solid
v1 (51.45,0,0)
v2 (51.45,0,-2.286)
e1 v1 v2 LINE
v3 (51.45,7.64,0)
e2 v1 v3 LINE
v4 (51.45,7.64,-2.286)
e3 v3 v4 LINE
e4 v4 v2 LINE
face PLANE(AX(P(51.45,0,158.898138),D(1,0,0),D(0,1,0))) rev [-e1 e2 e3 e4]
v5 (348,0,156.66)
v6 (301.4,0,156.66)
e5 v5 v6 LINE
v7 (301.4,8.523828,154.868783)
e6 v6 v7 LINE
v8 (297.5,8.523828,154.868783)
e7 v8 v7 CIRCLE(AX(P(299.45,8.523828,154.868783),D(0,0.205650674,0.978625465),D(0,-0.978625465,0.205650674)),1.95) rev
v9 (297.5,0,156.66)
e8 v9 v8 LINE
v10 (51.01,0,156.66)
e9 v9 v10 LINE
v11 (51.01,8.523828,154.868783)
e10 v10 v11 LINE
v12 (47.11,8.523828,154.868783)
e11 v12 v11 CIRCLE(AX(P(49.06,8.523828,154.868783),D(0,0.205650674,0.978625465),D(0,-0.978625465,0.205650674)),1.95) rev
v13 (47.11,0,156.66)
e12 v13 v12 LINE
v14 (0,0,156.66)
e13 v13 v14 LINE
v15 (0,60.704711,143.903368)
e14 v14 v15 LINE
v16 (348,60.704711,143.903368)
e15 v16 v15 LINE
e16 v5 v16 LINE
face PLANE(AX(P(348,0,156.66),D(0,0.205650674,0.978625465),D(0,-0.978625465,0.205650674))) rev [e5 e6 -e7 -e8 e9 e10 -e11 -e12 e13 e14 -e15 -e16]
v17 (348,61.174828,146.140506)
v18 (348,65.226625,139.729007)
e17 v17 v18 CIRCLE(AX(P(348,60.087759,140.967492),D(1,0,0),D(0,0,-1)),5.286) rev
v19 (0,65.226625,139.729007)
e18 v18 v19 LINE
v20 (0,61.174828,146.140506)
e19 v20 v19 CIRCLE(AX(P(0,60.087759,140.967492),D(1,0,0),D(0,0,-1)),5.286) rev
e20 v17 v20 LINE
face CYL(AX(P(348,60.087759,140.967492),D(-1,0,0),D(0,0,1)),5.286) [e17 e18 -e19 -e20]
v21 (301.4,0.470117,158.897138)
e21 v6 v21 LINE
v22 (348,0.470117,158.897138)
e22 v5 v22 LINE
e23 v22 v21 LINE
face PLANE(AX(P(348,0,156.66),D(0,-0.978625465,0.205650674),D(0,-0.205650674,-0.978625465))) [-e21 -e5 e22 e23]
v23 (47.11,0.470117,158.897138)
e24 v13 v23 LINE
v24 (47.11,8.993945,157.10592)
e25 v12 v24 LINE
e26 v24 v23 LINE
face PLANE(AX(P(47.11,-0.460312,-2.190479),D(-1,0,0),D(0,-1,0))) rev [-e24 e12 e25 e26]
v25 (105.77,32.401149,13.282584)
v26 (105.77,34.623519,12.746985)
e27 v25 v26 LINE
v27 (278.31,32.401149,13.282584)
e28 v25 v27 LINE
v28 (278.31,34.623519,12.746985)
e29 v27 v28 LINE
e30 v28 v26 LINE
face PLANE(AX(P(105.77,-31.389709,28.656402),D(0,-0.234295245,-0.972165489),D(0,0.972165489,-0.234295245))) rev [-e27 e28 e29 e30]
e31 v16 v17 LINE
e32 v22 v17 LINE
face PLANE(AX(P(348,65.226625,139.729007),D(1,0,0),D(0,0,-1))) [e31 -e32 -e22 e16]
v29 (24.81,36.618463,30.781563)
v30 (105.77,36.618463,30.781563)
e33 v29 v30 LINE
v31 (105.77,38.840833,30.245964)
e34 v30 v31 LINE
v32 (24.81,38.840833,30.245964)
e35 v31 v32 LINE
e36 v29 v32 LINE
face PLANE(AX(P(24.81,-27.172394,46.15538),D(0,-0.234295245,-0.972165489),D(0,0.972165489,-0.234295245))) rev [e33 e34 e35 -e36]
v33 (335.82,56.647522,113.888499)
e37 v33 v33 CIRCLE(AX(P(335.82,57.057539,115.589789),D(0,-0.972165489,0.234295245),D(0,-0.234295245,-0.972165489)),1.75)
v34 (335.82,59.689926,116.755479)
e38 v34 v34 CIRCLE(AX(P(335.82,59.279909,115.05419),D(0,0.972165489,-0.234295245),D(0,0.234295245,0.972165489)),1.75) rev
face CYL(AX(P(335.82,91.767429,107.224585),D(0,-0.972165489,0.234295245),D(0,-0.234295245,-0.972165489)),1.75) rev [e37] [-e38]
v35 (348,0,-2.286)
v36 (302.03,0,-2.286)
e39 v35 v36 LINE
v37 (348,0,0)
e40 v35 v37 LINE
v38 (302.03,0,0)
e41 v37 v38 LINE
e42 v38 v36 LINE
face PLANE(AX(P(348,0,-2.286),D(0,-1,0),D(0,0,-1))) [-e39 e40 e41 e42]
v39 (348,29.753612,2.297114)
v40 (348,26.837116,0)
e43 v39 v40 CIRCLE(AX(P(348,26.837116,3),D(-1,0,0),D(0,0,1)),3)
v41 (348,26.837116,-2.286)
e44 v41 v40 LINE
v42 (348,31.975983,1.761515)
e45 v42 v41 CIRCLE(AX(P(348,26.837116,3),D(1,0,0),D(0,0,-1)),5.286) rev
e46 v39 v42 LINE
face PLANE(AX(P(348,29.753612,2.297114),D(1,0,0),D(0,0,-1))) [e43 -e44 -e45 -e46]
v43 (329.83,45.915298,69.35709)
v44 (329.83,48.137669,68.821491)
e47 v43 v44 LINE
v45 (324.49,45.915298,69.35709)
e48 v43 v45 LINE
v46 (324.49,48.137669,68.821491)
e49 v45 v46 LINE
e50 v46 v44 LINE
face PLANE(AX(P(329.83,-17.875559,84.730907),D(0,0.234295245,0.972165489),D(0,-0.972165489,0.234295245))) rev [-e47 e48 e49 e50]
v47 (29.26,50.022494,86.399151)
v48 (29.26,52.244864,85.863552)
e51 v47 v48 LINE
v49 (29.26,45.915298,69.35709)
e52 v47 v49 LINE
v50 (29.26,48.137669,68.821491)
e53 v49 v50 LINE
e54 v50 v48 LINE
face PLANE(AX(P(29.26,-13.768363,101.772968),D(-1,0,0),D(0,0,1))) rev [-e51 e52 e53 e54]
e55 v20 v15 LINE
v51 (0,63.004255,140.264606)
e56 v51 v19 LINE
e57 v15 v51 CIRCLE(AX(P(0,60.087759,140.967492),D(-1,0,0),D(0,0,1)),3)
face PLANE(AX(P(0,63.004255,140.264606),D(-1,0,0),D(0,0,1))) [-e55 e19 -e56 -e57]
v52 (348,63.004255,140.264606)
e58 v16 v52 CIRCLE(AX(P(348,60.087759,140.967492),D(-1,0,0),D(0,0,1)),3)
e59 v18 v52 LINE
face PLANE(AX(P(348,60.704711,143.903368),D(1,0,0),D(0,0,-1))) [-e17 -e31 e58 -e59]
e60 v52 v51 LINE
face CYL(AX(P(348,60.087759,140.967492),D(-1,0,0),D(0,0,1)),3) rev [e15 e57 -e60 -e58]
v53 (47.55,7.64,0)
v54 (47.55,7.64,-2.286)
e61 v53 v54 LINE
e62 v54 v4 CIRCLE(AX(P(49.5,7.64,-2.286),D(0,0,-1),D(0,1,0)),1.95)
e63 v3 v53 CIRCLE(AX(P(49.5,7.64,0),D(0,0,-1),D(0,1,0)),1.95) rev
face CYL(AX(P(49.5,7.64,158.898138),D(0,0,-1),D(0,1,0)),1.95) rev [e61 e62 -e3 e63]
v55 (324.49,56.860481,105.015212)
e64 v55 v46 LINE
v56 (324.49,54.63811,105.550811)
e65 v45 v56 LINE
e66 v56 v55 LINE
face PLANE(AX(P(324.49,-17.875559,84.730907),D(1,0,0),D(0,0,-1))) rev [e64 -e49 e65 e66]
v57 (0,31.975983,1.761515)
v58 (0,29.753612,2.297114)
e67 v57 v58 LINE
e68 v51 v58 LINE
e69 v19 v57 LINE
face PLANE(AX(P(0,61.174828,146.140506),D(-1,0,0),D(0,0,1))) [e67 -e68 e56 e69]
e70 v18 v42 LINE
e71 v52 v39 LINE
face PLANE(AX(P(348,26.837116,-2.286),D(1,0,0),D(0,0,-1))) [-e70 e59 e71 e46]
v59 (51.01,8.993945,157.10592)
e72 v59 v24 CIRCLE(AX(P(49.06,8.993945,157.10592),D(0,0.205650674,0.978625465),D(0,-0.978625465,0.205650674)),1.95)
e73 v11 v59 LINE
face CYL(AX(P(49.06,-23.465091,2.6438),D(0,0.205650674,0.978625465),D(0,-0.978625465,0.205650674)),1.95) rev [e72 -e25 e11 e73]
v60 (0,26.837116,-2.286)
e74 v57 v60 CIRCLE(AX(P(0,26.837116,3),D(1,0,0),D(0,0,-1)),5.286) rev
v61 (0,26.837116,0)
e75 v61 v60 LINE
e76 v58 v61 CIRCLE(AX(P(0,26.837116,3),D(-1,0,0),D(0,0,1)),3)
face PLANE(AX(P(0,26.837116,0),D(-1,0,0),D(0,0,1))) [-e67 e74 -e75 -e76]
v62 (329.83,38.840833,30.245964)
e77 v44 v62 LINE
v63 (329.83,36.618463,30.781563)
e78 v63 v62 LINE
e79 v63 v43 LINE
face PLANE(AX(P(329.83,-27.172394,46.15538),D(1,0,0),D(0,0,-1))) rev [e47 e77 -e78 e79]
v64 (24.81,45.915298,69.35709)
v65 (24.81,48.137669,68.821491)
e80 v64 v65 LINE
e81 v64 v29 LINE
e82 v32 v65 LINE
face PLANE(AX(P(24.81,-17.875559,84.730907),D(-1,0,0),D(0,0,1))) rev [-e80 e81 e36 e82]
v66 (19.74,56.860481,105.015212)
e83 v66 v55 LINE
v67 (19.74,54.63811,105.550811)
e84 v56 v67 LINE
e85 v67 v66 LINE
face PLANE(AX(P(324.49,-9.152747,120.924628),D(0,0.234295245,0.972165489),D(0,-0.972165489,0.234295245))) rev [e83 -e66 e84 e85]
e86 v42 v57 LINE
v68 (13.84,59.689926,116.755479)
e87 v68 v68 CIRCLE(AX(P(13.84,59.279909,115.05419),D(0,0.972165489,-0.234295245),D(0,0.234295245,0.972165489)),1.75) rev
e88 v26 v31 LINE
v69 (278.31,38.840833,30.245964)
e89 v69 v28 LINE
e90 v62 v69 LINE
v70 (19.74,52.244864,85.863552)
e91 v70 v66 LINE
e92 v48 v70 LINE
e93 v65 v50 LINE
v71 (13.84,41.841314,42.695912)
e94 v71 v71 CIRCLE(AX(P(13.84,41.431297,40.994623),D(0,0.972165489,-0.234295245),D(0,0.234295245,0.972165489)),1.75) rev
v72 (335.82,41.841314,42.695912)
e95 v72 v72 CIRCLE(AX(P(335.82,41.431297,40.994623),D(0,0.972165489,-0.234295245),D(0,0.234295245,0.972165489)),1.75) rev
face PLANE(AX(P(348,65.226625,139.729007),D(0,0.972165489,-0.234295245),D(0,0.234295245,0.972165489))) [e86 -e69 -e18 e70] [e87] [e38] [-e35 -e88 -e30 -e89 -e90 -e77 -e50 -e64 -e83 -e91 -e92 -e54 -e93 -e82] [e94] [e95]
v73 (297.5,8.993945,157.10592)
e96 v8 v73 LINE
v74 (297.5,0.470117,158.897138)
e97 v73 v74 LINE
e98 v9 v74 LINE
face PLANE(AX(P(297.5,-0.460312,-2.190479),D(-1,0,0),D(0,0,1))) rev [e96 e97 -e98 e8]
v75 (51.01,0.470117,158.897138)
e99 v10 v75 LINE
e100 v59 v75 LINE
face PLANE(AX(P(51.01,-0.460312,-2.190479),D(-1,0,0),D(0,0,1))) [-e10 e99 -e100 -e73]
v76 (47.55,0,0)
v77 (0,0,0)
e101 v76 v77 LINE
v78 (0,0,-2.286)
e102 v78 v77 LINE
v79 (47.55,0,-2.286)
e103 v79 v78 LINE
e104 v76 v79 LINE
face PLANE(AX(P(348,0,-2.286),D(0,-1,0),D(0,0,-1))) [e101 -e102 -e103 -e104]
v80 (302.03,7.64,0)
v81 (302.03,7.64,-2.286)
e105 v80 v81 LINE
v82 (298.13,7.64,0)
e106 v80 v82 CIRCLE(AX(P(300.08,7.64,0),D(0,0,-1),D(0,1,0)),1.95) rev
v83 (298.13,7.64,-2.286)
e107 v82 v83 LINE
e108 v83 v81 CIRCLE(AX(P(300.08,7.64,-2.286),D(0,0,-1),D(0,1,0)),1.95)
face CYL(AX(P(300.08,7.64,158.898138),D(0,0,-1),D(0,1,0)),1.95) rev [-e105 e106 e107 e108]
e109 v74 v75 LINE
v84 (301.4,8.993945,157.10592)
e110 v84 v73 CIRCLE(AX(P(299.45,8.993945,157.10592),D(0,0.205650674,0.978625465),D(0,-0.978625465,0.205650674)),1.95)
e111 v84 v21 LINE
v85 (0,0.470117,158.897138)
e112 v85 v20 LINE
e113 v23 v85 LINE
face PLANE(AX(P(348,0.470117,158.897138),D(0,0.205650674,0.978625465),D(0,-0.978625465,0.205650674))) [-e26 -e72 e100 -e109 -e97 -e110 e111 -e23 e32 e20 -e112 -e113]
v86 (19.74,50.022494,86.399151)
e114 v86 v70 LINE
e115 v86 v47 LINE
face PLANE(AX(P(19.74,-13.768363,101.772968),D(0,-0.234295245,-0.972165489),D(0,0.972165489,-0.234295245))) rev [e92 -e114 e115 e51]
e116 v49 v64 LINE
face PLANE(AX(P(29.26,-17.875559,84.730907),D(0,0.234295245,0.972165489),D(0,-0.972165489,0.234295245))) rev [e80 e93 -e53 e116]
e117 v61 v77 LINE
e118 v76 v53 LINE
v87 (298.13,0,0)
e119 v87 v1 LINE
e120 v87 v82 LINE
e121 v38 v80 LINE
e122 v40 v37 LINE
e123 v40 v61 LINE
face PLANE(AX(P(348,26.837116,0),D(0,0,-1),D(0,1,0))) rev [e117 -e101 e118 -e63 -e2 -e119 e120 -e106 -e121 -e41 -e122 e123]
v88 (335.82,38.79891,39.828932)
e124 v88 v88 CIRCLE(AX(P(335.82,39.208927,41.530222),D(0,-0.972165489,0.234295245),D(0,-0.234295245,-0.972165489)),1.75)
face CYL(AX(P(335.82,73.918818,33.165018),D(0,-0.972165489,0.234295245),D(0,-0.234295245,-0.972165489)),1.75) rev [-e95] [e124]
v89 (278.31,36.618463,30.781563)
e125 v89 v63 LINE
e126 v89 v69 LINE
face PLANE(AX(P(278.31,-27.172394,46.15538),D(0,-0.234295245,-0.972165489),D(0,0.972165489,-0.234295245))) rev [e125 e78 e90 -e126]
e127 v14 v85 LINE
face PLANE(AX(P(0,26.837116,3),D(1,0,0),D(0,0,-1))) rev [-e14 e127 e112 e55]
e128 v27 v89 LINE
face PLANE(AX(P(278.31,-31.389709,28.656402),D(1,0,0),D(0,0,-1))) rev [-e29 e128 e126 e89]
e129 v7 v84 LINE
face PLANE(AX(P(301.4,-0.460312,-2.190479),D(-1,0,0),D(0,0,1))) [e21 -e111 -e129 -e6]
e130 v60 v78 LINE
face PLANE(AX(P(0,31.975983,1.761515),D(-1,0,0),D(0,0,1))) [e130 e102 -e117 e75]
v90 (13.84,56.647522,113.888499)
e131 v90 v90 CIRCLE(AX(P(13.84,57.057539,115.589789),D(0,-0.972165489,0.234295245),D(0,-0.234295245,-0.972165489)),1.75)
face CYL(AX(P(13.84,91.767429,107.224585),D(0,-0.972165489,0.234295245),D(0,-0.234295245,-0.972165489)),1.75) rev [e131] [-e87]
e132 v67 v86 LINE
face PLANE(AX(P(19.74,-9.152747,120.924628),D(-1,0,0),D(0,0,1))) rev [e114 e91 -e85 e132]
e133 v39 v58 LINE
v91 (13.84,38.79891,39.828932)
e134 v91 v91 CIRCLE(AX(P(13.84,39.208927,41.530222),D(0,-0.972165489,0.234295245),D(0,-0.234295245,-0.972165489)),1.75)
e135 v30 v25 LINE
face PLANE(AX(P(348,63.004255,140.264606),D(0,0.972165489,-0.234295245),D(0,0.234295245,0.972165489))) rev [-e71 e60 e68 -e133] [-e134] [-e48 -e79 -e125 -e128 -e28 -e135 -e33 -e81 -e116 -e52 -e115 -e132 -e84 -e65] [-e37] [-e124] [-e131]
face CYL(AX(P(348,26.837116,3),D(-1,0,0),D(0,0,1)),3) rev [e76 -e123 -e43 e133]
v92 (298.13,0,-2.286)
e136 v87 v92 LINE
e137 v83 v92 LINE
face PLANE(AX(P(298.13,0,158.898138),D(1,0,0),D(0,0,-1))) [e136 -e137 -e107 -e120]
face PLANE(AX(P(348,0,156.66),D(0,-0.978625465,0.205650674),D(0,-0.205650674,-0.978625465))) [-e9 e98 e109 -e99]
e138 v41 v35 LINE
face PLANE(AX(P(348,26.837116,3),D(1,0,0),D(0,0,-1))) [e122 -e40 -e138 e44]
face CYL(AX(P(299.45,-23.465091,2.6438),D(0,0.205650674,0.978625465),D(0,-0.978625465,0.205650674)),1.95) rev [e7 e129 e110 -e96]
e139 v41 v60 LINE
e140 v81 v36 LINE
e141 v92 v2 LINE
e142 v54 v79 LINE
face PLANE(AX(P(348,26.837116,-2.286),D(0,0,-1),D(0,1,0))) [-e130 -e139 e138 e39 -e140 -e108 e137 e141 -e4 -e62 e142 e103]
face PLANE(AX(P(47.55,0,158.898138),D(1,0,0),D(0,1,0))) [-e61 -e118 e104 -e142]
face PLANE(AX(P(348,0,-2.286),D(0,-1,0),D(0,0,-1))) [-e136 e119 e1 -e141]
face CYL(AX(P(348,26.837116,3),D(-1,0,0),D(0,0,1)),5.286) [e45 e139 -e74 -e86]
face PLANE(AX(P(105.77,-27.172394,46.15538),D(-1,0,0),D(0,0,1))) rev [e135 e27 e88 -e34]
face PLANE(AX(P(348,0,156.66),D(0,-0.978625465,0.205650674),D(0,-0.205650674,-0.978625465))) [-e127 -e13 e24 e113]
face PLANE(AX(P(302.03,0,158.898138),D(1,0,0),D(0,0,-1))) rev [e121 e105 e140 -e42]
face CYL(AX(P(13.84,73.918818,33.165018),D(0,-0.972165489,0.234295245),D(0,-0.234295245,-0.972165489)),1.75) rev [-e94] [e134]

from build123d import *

# Parameters (mm, degrees)
BASE_FLANGE1_DEPTH = 348
CUT_EXTRUDE1_REACH = 391.047
SKETCH6_R          = 1.95
CUT_EXTRUDE2_REACH = 384.238
SKETCH7_R          = 1.95
CUT_EXTRUDE3_REACH = 389.236
CUT_EXTRUDE4_REACH = 389.217
SKETCH9_R          = 1.75


# Sheet-metal steps are written as plain solids
with BuildPart() as part:
    # Sketch1 → Base-Flange1 (new body)
    with BuildSketch(Plane(origin=(0, 0, 0), x_dir=(0, 0, -1), z_dir=(1, 0, 0))):
        with BuildLine():
            Line((-156.66, 0), (-143.903368262, 60.704710735))
            ThreePointArc((-143.903368262, 60.704710735), (-142.570157767, 62.623791445), (-140.264606132, 63.004255181))
            Line((-140.264606132, 63.004255181), (-2.297114265, 29.753612482))
            ThreePointArc((-2.297114265, 29.753612482), (-0.643237686, 28.693367991), (0, 26.837116015))
            Line((0, 26.837116015), (0, 0))
            Line((0, 0), (2.286, 0))
            Line((2.286, 0), (2.286, 26.837116015))
            ThreePointArc((2.286, 26.837116015), (1.152615197, 30.107831996), (-1.761515334, 31.97598279))
            Line((-1.761515334, 31.97598279), (-139.729007202, 65.226625489))
            ThreePointArc((-139.729007202, 65.226625489), (-143.791389182, 64.556248387), (-146.140506074, 61.174828176))
            Line((-146.140506074, 61.174828176), (-158.897137813, 0.47011744))
            Line((-158.897137813, 0.47011744), (-156.66, 0))
        make_face()
    extrude(amount=BASE_FLANGE1_DEPTH)

    # Sketch6 → Cut-Extrude1 (cut, up to next)
    with BuildSketch(Plane(origin=(0, 0, -2.286), x_dir=(-1, 0, 0), z_dir=(0, 0, -1)), mode=Mode.PRIVATE) as cut_extrude1_sk1:
        with BuildLine():
            Line((-51.45, 7.64), (-51.45, 0))
            Line((-51.45, 0), (-47.55, 0))
            Line((-47.55, 0), (-47.55, 7.64))
            ThreePointArc((-47.55, 7.64), (-49.5, 5.69), (-51.45, 7.64))
        make_face()
    cut_extrude1_tool1 = extrude(cut_extrude1_sk1.sketch, amount=-CUT_EXTRUDE1_REACH, mode=Mode.PRIVATE) & part.part
    # Sketch6 → Cut-Extrude1 (cut, up to next)
    with BuildSketch(Plane(origin=(0, 0, -2.286), x_dir=(-1, 0, 0), z_dir=(0, 0, -1)), mode=Mode.PRIVATE) as cut_extrude1_sk2:
        with Locations((-49.5, 7.64)):
            Circle(SKETCH6_R)
    cut_extrude1_tool2 = extrude(cut_extrude1_sk2.sketch, amount=-CUT_EXTRUDE1_REACH, mode=Mode.PRIVATE) & part.part
    # Sketch6 → Cut-Extrude1 (cut, up to next)
    with BuildSketch(Plane(origin=(0, 0, -2.286), x_dir=(-1, 0, 0), z_dir=(0, 0, -1)), mode=Mode.PRIVATE) as cut_extrude1_sk3:
        with BuildLine():
            ThreePointArc((-298.13, 7.64), (-300.08, 5.69), (-302.03, 7.64))
            Line((-302.03, 7.64), (-302.03, 0))
            Line((-302.03, 0), (-298.13, 0))
            Line((-298.13, 0), (-298.13, 7.64))
        make_face()
    cut_extrude1_tool3 = extrude(cut_extrude1_sk3.sketch, amount=-CUT_EXTRUDE1_REACH, mode=Mode.PRIVATE) & part.part
    # Sketch6 → Cut-Extrude1 (cut, up to next)
    with BuildSketch(Plane(origin=(0, 0, -2.286), x_dir=(-1, 0, 0), z_dir=(0, 0, -1)), mode=Mode.PRIVATE) as cut_extrude1_sk4:
        with Locations((-300.08, 7.64)):
            Circle(SKETCH6_R)
    cut_extrude1_tool4 = extrude(cut_extrude1_sk4.sketch, amount=-CUT_EXTRUDE1_REACH, mode=Mode.PRIVATE) & part.part
    add(cut_extrude1_tool1.solids().sort_by_distance((49.5, 3.069742, -2.286))[0], mode=Mode.SUBTRACT)
    add(cut_extrude1_tool2.solids().sort_by_distance((49.5, 7.64, -2.286))[0], mode=Mode.SUBTRACT)
    add(cut_extrude1_tool3.solids().sort_by_distance((300.08, 3.069742, -2.286))[0], mode=Mode.SUBTRACT)
    add(cut_extrude1_tool4.solids().sort_by_distance((300.08, 7.64, -2.286))[0], mode=Mode.SUBTRACT)

    # Sketch7 → Cut-Extrude2 (cut, up to next)
    with BuildSketch(Plane(origin=(0, 31.998723581, 152.271641819), x_dir=(1, 0, 0), z_dir=(0, 0.20565067377814067, 0.9786254648100042)), mode=Mode.PRIVATE) as cut_extrude2_sk1:
        with Locations((299.45, -23.507234554)):
            Circle(SKETCH7_R)
    cut_extrude2_tool1 = extrude(cut_extrude2_sk1.sketch, amount=-CUT_EXTRUDE2_REACH, mode=Mode.PRIVATE) & part.part
    # Sketch7 → Cut-Extrude2 (cut, up to next)
    with BuildSketch(Plane(origin=(0, 31.998723581, 152.271641819), x_dir=(1, 0, 0), z_dir=(0, 0.20565067377814067, 0.9786254648100042)), mode=Mode.PRIVATE) as cut_extrude2_sk2:
        with BuildLine():
            Line((297.5, -23.507234554), (297.5, -32.217234554))
            Line((297.5, -32.217234554), (301.4, -32.217234554))
            Line((301.4, -32.217234554), (301.4, -23.507234554))
            ThreePointArc((301.4, -23.507234554), (299.45, -25.457234554), (297.5, -23.507234554))
        make_face()
    cut_extrude2_tool2 = extrude(cut_extrude2_sk2.sketch, amount=-CUT_EXTRUDE2_REACH, mode=Mode.PRIVATE) & part.part
    # Sketch7 → Cut-Extrude2 (cut, up to next)
    with BuildSketch(Plane(origin=(0, 31.998723581, 152.271641819), x_dir=(1, 0, 0), z_dir=(0, 0.20565067377814067, 0.9786254648100042)), mode=Mode.PRIVATE) as cut_extrude2_sk3:
        with Locations((49.06, -23.507234554)):
            Circle(SKETCH7_R)
    cut_extrude2_tool3 = extrude(cut_extrude2_sk3.sketch, amount=-CUT_EXTRUDE2_REACH, mode=Mode.PRIVATE) & part.part
    # Sketch7 → Cut-Extrude2 (cut, up to next)
    with BuildSketch(Plane(origin=(0, 31.998723581, 152.271641819), x_dir=(1, 0, 0), z_dir=(0, 0.20565067377814067, 0.9786254648100042)), mode=Mode.PRIVATE) as cut_extrude2_sk4:
        with BuildLine():
            ThreePointArc((51.01, -23.507234554), (49.06, -25.457234554), (47.11, -23.507234554))
            Line((47.11, -23.507234554), (47.11, -32.217234554))
            Line((47.11, -32.217234554), (51.01, -32.217234554))
            Line((51.01, -32.217234554), (51.01, -23.507234554))
        make_face()
    cut_extrude2_tool4 = extrude(cut_extrude2_sk4.sketch, amount=-CUT_EXTRUDE2_REACH, mode=Mode.PRIVATE) & part.part
    add(cut_extrude2_tool1.solids().sort_by_distance((299.45, 8.993945, 157.10592))[0], mode=Mode.SUBTRACT)
    add(cut_extrude2_tool2.solids().sort_by_distance((299.45, 3.995548, 158.156295))[0], mode=Mode.SUBTRACT)
    add(cut_extrude2_tool3.solids().sort_by_distance((49.06, 8.993945, 157.10592))[0], mode=Mode.SUBTRACT)
    add(cut_extrude2_tool4.solids().sort_by_distance((49.06, 3.995548, 158.156295))[0], mode=Mode.SUBTRACT)

    # Sketch8 → Cut-Extrude3 (cut, up to next)
    with BuildSketch(Plane(origin=(0, 29.819457861, -7.186592475), x_dir=(1, 0, 0), z_dir=(0, 0.9721654890653966, -0.23429524508670335)), mode=Mode.PRIVATE) as cut_extrude3_sk1:
        Polygon((324.49, -115.414305141), (19.74, -115.414305141), (19.74, -95.714305141), (29.26, -95.714305141), (29.26, -78.184305141), (24.81, -78.184305141), (24.81, -38.504305141), (105.77, -38.504305141), (105.77, -20.504305141), (278.31, -20.504305141), (278.31, -38.504305141), (329.83, -38.504305141), (329.83, -78.184305141), (324.49, -78.184305141), align=None)
    cut_extrude3_tool1 = extrude(cut_extrude3_sk1.sketch, amount=-CUT_EXTRUDE3_REACH, mode=Mode.PRIVATE) & part.part
    add(cut_extrude3_tool1.solids().sort_by_distance((177.78099, 46.525494, 62.132065))[0], mode=Mode.SUBTRACT)

    # Sketch9 → Cut-Extrude4 (cut, up to next)
    with BuildSketch(Plane(origin=(0, 27.597087553, -6.650993545), x_dir=(1, 0, 0), z_dir=(0, -0.9721654890653966, 0.23429524508670332)), mode=Mode.PRIVATE) as cut_extrude4_sk1:
        with Locations(Location((13.84, 125.740713464, 0), (0, 0, 270))):
            Circle(SKETCH9_R)
    cut_extrude4_tool1 = extrude(cut_extrude4_sk1.sketch, amount=-CUT_EXTRUDE4_REACH, mode=Mode.PRIVATE) & part.part
    # Sketch9 → Cut-Extrude4 (cut, up to next)
    with BuildSketch(Plane(origin=(0, 27.597087553, -6.650993545), x_dir=(1, 0, 0), z_dir=(0, -0.9721654890653966, 0.23429524508670332)), mode=Mode.PRIVATE) as cut_extrude4_sk2:
        with Locations(Location((335.82, 125.740713464, 0), (0, 0, 270))):
            Circle(SKETCH9_R)
    cut_extrude4_tool2 = extrude(cut_extrude4_sk2.sketch, amount=-CUT_EXTRUDE4_REACH, mode=Mode.PRIVATE) & part.part
    # Sketch9 → Cut-Extrude4 (cut, up to next)
    with BuildSketch(Plane(origin=(0, 27.597087553, -6.650993545), x_dir=(1, 0, 0), z_dir=(0, -0.9721654890653966, 0.23429524508670332)), mode=Mode.PRIVATE) as cut_extrude4_sk3:
        with Locations(Location((335.82, 49.560713464, 0), (0, 0, 270))):
            Circle(SKETCH9_R)
    cut_extrude4_tool3 = extrude(cut_extrude4_sk3.sketch, amount=-CUT_EXTRUDE4_REACH, mode=Mode.PRIVATE) & part.part
    # Sketch9 → Cut-Extrude4 (cut, up to next)
    with BuildSketch(Plane(origin=(0, 27.597087553, -6.650993545), x_dir=(1, 0, 0), z_dir=(0, -0.9721654890653966, 0.23429524508670332)), mode=Mode.PRIVATE) as cut_extrude4_sk4:
        with Locations(Location((13.84, 49.560713464, 0), (0, 0, 270))):
            Circle(SKETCH9_R)
    cut_extrude4_tool4 = extrude(cut_extrude4_sk4.sketch, amount=-CUT_EXTRUDE4_REACH, mode=Mode.PRIVATE) & part.part
    add(cut_extrude4_tool1.solids().sort_by_distance((13.84, 57.057539, 115.589789))[0], mode=Mode.SUBTRACT)
    add(cut_extrude4_tool2.solids().sort_by_distance((335.82, 57.057539, 115.589789))[0], mode=Mode.SUBTRACT)
    add(cut_extrude4_tool3.solids().sort_by_distance((335.82, 39.208927, 41.530222))[0], mode=Mode.SUBTRACT)
    add(cut_extrude4_tool4.solids().sort_by_distance((13.84, 39.208927, 41.530222))[0], mode=Mode.SUBTRACT)


solid = part.part
